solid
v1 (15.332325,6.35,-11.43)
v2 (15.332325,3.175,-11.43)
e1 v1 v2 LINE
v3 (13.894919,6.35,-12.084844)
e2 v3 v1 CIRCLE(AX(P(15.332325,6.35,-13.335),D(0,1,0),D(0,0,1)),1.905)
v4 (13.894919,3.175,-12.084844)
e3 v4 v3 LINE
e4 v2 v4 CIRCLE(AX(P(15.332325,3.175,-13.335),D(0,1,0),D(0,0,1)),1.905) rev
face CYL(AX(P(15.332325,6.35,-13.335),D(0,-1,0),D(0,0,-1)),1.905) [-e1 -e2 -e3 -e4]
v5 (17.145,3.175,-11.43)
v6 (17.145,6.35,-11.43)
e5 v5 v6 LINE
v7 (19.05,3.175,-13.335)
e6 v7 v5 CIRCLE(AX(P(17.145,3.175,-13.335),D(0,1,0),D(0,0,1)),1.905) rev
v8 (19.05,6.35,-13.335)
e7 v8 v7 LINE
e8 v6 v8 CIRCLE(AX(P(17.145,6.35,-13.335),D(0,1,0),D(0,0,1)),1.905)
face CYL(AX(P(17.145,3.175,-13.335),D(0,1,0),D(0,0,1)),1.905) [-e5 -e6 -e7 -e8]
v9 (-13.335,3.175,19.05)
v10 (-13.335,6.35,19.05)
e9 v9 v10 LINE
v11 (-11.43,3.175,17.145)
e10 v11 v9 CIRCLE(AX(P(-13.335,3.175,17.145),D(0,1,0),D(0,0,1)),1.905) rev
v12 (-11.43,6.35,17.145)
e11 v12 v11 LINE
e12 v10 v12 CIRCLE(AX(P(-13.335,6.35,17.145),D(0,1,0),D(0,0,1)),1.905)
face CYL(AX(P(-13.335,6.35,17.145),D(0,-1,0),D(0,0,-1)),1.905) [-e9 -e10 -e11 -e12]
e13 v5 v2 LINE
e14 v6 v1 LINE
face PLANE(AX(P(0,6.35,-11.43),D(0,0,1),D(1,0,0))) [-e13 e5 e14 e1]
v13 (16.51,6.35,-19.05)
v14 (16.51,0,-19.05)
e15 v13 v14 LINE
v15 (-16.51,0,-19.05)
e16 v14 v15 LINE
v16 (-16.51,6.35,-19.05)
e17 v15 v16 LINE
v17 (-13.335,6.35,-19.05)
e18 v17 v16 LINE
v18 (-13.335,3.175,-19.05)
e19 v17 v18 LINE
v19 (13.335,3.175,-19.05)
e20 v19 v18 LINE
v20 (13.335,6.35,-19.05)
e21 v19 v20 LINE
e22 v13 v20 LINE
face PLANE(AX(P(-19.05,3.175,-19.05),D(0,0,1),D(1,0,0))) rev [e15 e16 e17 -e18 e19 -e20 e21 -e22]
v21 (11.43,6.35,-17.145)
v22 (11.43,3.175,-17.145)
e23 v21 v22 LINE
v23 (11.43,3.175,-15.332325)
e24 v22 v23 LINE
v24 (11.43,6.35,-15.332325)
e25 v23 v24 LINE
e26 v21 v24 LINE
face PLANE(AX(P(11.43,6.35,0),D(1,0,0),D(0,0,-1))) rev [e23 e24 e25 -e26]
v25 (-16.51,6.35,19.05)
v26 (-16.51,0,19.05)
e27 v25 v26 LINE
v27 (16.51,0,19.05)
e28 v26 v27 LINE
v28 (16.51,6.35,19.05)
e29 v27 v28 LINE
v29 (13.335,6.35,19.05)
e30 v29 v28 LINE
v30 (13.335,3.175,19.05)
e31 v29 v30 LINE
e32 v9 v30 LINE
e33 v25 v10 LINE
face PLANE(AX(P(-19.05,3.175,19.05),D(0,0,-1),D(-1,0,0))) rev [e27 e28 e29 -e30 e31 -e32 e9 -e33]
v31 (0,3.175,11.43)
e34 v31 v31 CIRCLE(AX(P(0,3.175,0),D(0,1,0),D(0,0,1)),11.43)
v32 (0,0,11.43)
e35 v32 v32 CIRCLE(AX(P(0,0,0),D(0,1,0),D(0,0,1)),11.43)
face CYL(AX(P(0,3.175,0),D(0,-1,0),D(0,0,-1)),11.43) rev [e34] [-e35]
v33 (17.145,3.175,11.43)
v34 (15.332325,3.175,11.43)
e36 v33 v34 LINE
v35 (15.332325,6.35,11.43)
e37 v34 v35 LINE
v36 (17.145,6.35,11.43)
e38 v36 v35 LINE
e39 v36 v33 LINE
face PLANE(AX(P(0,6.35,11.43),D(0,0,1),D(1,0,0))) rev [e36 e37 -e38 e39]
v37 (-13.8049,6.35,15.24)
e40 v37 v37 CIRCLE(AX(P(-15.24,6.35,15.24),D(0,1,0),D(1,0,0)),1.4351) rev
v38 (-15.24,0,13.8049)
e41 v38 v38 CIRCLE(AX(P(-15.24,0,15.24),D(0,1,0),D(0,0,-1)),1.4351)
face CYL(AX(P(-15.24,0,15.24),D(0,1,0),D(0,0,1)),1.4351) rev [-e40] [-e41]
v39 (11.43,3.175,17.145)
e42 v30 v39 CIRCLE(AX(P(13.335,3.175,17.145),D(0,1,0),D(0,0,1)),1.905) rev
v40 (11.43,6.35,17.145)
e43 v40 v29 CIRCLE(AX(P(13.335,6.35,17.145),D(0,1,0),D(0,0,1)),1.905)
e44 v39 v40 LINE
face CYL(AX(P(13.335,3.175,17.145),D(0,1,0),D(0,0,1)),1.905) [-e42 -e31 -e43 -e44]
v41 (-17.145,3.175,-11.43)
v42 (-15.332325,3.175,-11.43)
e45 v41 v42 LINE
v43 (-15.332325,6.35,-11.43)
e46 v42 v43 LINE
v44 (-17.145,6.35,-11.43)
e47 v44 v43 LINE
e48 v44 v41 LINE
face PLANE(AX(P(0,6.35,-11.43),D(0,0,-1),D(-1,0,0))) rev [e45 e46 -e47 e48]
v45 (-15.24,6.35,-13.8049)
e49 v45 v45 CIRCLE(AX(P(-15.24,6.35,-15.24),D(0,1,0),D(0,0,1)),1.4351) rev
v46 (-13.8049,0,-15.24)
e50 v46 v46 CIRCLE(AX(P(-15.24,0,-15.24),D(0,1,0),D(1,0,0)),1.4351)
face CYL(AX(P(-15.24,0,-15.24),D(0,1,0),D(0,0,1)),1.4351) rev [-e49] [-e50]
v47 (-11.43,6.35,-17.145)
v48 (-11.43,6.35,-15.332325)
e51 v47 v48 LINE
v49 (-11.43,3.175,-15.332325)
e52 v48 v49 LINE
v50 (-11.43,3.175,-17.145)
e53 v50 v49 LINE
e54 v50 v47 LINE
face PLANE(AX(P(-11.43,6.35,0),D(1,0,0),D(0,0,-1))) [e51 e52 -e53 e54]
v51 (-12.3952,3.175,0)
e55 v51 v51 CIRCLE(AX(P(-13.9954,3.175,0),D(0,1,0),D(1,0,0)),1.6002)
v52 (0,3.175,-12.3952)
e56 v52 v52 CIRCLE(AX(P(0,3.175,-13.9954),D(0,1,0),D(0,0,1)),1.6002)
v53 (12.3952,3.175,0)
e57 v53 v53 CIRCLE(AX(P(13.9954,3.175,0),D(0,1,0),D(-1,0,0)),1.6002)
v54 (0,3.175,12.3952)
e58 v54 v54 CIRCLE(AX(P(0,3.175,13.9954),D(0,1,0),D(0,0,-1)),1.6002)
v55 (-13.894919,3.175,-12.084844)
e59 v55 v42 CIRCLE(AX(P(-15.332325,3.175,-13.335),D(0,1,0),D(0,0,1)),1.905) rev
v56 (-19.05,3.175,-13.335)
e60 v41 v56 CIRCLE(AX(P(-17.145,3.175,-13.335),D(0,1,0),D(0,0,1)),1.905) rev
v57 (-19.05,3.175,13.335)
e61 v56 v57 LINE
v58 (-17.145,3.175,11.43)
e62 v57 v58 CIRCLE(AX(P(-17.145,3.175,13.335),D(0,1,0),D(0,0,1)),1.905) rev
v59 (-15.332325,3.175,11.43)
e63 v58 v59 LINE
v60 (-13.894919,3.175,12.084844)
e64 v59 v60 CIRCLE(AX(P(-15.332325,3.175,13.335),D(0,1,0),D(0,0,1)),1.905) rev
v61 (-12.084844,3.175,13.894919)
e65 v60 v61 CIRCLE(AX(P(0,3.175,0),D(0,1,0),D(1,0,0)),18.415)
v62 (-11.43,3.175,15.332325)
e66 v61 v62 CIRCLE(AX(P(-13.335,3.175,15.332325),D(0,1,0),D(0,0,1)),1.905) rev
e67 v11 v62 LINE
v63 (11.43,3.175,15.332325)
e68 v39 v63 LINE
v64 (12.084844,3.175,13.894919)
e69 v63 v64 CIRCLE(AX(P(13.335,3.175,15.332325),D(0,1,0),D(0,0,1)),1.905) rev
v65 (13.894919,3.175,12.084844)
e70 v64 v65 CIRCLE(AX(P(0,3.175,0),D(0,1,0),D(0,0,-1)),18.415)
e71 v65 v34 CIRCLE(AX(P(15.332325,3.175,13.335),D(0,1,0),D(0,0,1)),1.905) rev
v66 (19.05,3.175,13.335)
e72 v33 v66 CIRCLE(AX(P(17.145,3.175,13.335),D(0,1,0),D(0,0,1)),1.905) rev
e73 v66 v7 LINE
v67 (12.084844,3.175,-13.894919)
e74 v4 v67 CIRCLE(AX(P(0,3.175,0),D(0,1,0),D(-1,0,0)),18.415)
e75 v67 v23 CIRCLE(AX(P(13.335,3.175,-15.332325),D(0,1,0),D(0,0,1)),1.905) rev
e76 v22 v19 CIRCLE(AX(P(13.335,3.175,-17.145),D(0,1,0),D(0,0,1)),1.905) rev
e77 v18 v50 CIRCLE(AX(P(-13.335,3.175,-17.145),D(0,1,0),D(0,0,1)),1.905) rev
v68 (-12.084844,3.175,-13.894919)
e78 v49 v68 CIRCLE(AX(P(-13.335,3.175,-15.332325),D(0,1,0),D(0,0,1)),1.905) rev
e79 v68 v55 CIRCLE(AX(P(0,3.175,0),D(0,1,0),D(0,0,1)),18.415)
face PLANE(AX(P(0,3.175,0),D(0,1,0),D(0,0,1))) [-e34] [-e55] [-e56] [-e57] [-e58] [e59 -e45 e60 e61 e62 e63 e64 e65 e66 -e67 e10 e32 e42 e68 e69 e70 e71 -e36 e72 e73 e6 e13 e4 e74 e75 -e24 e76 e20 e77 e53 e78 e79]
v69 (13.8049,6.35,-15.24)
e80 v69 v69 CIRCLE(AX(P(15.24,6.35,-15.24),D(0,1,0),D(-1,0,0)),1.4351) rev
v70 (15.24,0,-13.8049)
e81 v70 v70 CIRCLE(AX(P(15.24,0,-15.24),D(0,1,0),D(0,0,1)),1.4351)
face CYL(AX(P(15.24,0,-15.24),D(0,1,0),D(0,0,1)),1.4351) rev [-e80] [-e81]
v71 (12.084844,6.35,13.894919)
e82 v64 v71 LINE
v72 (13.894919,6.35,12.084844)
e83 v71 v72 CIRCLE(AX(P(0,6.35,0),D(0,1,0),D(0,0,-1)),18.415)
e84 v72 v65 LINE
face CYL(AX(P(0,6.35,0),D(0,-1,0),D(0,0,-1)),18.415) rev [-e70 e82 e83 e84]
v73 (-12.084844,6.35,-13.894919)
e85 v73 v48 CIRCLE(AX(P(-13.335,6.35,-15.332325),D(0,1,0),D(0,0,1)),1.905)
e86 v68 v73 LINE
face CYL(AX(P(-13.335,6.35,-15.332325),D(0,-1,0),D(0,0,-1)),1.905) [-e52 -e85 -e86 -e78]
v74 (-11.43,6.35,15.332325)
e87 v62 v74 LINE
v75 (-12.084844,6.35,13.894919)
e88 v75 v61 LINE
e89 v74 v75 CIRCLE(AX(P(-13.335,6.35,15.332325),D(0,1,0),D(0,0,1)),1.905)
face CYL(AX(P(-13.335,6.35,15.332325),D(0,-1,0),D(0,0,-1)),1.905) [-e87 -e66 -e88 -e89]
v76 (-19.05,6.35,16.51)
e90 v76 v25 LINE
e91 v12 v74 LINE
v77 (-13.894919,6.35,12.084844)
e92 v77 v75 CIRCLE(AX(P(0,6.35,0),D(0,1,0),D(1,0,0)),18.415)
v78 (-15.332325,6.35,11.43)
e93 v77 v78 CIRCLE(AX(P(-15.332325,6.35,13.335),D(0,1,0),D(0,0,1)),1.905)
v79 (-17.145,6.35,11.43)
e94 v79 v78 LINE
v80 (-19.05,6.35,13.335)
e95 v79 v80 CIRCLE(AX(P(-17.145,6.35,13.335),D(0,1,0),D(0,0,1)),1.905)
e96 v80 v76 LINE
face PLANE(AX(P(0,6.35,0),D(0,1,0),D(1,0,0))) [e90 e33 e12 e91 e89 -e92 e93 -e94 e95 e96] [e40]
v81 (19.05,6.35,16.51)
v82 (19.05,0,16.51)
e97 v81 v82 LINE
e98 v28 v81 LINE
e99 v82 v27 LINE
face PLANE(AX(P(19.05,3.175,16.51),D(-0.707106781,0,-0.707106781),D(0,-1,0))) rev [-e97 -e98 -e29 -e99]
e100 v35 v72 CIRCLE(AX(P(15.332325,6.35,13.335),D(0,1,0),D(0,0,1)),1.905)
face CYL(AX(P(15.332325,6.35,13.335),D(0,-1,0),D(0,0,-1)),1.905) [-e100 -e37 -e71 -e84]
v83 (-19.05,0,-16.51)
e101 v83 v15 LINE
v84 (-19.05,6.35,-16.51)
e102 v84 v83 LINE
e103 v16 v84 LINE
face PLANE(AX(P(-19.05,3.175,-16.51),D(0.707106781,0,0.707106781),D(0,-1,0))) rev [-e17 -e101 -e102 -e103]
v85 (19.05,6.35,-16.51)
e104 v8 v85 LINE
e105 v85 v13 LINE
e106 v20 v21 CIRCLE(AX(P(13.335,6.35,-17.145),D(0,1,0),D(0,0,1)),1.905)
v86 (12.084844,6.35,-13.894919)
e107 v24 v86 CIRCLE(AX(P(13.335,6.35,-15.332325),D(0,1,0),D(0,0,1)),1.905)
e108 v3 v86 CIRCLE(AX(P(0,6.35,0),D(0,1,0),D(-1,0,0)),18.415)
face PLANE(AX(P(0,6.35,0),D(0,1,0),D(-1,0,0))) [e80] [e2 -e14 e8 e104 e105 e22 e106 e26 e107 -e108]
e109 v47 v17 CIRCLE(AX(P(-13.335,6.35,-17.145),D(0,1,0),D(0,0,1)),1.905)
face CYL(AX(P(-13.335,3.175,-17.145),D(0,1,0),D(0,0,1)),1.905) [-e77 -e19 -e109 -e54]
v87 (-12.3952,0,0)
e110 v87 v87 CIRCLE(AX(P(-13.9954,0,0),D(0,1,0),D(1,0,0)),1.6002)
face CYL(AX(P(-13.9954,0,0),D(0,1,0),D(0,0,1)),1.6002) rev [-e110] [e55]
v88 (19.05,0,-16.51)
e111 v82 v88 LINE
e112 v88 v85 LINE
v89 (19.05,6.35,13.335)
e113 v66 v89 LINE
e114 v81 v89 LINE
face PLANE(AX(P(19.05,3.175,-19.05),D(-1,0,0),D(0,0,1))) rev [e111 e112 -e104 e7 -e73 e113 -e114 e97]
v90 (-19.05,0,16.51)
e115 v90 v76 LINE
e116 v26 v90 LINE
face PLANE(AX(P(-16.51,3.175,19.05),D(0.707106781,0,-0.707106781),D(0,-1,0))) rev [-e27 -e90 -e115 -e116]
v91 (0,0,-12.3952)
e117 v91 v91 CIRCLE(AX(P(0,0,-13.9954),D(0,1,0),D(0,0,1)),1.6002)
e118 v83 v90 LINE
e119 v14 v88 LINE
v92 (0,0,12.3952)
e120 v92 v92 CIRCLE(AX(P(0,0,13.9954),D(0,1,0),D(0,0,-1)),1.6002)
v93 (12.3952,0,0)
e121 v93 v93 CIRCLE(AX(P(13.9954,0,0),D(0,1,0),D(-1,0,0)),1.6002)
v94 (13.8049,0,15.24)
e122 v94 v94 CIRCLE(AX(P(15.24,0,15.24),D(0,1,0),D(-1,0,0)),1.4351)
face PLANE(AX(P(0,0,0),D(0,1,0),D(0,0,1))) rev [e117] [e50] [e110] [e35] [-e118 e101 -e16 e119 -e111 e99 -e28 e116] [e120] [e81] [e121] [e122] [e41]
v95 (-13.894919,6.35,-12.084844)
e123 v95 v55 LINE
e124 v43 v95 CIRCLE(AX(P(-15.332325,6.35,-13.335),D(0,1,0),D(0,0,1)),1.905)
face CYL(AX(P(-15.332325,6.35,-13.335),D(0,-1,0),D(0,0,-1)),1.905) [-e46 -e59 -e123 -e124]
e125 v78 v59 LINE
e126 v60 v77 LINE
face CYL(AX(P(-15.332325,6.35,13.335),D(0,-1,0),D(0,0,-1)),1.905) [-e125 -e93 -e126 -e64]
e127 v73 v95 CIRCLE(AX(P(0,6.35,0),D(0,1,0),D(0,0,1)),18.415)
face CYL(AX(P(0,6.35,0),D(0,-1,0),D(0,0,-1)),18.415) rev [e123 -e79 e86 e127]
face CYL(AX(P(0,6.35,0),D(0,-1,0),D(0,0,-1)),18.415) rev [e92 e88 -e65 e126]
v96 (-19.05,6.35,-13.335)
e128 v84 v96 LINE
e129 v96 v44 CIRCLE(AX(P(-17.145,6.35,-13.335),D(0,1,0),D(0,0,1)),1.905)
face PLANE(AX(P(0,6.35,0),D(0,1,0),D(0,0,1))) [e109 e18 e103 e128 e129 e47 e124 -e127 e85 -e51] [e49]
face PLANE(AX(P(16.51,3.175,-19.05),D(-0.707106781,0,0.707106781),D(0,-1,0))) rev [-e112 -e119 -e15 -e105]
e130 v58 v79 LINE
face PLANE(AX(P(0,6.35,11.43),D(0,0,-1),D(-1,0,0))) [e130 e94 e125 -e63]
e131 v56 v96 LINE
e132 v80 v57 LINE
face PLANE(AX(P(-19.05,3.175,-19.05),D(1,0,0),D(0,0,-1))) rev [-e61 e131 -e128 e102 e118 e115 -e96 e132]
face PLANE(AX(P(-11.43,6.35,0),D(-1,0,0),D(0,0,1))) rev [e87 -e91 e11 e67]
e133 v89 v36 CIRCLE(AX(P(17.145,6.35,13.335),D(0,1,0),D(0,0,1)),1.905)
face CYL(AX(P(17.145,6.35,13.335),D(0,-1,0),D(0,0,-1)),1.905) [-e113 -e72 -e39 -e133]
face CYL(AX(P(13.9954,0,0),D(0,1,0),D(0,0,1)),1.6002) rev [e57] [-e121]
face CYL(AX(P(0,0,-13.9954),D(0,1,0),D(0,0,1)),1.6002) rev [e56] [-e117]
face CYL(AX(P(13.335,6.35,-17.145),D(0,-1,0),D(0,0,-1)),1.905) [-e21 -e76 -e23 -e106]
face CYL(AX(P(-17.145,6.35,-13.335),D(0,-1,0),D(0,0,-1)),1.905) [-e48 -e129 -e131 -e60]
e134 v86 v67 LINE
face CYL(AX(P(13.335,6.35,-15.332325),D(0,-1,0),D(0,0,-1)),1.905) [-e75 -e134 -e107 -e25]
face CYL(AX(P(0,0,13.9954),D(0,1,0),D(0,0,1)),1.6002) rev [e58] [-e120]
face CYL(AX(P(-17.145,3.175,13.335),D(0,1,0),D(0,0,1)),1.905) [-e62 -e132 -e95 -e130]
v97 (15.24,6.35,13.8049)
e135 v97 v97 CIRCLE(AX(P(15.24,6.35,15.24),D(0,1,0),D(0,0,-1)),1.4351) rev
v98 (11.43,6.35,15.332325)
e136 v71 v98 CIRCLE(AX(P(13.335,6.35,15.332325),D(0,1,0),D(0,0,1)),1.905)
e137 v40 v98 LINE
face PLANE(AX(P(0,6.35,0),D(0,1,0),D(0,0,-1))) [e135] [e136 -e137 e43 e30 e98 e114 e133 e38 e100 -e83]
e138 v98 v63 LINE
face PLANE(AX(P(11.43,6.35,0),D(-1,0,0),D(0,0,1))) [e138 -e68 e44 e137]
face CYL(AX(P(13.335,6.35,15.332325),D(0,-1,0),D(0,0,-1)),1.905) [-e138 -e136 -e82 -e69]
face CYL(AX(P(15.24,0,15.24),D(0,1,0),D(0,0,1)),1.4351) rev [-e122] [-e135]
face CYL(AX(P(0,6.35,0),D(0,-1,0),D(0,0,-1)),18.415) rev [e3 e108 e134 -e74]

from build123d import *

# Parameters (mm, degrees)
SKETCH1_W                = 38.1
SKETCH1_H                = 38.1
SKETCH1_R                = 11.43
BOSS_EXTRUDE1_DEPTH      = 3.175
SKETCH2_R                = 1.6002
SKETCH2_R_2              = 1.4351
CUT_EXTRUDE1_DEPTH       = 28.127211891
CIRPATTERN1_COUNT        = 4
CHAMFER1_SIZE            = 2.54
BOSS_EXTRUDE2_START      = 3.175
SKETCH3_R                = 1.4351
BOSS_EXTRUDE2_DEPTH      = 3.175
FILLET1_R                = 1.905
CIRPATTERN7_COUNT        = 4
FILLET1_OF_CIRPATTERN7_R = 1.905


with BuildPart() as part:
    # Sketch1 → Boss-Extrude1 (new body)
    with BuildSketch(Plane(origin=(0, 0, 0), x_dir=(1, 0, 0), z_dir=(0, 1, 0))):
        Rectangle(SKETCH1_W, SKETCH1_H)
        Circle(SKETCH1_R, mode=Mode.SUBTRACT)
    extrude(amount=BOSS_EXTRUDE1_DEPTH)

    # Sketch2 → Cut-Extrude1 (cut, through all)
    with BuildSketch(Plane(origin=(0, 3.175, 0), x_dir=(1, 0, 0), z_dir=(0, 1, 0))):
        with Locations((0, 13.9954)):
            Circle(SKETCH2_R)
        with Locations((15.24, 15.24)):
            Circle(SKETCH2_R_2)
    cut_extrude1 = extrude(amount=-CUT_EXTRUDE1_DEPTH, mode=Mode.SUBTRACT)

    # CirPattern1: Cut-Extrude1 ×4 about axis
    cirpattern1_axis = Axis((0, 3.175, 0), (0, -1, 0))
    for i in range(1, CIRPATTERN1_COUNT):
        add(cut_extrude1.rotate(cirpattern1_axis, i * 360 / CIRPATTERN1_COUNT), mode=Mode.SUBTRACT)

    # Chamfer1
    chamfer1_edges = [part.edges().sort_by_distance(p)[0] for p in [
        (-19.05, 1.5875, 19.05),
        (19.05, 1.5875, 19.05),
        (19.05, 1.5875, -19.05),
        (-19.05, 1.5875, -19.05),
    ]]
    chamfer(chamfer1_edges, length=CHAMFER1_SIZE)

    # Sketch3 → Boss-Extrude2 (add)
    with BuildSketch(Plane(origin=(0, 3.175, 0), x_dir=(1, 0, 0), z_dir=(0, 1, 0)).offset(BOSS_EXTRUDE2_START)):
        with BuildLine():
            Line((-19.05, 16.51), (-19.05, 11.43))
            Line((-19.05, 11.43), (-14.438397591, 11.43))
            ThreePointArc((-14.438397591, 11.43), (-13.021371376, 13.021371376), (-11.43, 14.438397591))
            Line((-11.43, 14.438397591), (-11.43, 19.05))
            Line((-11.43, 19.05), (-16.51, 19.05))
            Line((-16.51, 19.05), (-19.05, 16.51))
        make_face()
        with Locations((-15.24, 15.24)):
            Circle(SKETCH3_R, mode=Mode.SUBTRACT)
    boss_extrude2 = extrude(amount=-BOSS_EXTRUDE2_DEPTH)

    # Fillet1
    fillet1_edges = [part.edges().sort_by_distance(p)[0] for p in [
        (-19.05, 4.7625, -11.43),
        (-11.43, 4.7625, -19.05),
        (-11.43, 4.7625, -14.438397591),
        (-14.438397591, 4.7625, -11.43),
    ]]
    fillet(fillet1_edges, radius=FILLET1_R)

    # CirPattern7: Boss-Extrude2 ×4 about axis
    cirpattern7_axis = Axis((0, 3.175, 0), (0, -1, 0))
    for i in range(1, CIRPATTERN7_COUNT):
        add(boss_extrude2.rotate(cirpattern7_axis, i * 360 / CIRPATTERN7_COUNT))

    # Fillet1 of CirPattern7
    fillet1_of_cirpattern7_edges = [part.edges().sort_by_distance(p)[0] for p in [
        (11.43, 4.7625, -19.05),
        (19.05, 4.7625, -11.43),
        (14.438397591, 4.7625, -11.43),
        (11.43, 4.7625, -14.438397591),
        (19.05, 4.7625, 11.43),
        (11.43, 4.7625, 19.05),
        (11.43, 4.7625, 14.438397591),
        (14.438397591, 4.7625, 11.43),
        (-11.43, 4.7625, 19.05),
        (-19.05, 4.7625, 11.43),
        (-14.438397591, 4.7625, 11.43),
        (-11.43, 4.7625, 14.438397591),
    ]]
    fillet(fillet1_of_cirpattern7_edges, radius=FILLET1_OF_CIRPATTERN7_R)


solid = part.part
